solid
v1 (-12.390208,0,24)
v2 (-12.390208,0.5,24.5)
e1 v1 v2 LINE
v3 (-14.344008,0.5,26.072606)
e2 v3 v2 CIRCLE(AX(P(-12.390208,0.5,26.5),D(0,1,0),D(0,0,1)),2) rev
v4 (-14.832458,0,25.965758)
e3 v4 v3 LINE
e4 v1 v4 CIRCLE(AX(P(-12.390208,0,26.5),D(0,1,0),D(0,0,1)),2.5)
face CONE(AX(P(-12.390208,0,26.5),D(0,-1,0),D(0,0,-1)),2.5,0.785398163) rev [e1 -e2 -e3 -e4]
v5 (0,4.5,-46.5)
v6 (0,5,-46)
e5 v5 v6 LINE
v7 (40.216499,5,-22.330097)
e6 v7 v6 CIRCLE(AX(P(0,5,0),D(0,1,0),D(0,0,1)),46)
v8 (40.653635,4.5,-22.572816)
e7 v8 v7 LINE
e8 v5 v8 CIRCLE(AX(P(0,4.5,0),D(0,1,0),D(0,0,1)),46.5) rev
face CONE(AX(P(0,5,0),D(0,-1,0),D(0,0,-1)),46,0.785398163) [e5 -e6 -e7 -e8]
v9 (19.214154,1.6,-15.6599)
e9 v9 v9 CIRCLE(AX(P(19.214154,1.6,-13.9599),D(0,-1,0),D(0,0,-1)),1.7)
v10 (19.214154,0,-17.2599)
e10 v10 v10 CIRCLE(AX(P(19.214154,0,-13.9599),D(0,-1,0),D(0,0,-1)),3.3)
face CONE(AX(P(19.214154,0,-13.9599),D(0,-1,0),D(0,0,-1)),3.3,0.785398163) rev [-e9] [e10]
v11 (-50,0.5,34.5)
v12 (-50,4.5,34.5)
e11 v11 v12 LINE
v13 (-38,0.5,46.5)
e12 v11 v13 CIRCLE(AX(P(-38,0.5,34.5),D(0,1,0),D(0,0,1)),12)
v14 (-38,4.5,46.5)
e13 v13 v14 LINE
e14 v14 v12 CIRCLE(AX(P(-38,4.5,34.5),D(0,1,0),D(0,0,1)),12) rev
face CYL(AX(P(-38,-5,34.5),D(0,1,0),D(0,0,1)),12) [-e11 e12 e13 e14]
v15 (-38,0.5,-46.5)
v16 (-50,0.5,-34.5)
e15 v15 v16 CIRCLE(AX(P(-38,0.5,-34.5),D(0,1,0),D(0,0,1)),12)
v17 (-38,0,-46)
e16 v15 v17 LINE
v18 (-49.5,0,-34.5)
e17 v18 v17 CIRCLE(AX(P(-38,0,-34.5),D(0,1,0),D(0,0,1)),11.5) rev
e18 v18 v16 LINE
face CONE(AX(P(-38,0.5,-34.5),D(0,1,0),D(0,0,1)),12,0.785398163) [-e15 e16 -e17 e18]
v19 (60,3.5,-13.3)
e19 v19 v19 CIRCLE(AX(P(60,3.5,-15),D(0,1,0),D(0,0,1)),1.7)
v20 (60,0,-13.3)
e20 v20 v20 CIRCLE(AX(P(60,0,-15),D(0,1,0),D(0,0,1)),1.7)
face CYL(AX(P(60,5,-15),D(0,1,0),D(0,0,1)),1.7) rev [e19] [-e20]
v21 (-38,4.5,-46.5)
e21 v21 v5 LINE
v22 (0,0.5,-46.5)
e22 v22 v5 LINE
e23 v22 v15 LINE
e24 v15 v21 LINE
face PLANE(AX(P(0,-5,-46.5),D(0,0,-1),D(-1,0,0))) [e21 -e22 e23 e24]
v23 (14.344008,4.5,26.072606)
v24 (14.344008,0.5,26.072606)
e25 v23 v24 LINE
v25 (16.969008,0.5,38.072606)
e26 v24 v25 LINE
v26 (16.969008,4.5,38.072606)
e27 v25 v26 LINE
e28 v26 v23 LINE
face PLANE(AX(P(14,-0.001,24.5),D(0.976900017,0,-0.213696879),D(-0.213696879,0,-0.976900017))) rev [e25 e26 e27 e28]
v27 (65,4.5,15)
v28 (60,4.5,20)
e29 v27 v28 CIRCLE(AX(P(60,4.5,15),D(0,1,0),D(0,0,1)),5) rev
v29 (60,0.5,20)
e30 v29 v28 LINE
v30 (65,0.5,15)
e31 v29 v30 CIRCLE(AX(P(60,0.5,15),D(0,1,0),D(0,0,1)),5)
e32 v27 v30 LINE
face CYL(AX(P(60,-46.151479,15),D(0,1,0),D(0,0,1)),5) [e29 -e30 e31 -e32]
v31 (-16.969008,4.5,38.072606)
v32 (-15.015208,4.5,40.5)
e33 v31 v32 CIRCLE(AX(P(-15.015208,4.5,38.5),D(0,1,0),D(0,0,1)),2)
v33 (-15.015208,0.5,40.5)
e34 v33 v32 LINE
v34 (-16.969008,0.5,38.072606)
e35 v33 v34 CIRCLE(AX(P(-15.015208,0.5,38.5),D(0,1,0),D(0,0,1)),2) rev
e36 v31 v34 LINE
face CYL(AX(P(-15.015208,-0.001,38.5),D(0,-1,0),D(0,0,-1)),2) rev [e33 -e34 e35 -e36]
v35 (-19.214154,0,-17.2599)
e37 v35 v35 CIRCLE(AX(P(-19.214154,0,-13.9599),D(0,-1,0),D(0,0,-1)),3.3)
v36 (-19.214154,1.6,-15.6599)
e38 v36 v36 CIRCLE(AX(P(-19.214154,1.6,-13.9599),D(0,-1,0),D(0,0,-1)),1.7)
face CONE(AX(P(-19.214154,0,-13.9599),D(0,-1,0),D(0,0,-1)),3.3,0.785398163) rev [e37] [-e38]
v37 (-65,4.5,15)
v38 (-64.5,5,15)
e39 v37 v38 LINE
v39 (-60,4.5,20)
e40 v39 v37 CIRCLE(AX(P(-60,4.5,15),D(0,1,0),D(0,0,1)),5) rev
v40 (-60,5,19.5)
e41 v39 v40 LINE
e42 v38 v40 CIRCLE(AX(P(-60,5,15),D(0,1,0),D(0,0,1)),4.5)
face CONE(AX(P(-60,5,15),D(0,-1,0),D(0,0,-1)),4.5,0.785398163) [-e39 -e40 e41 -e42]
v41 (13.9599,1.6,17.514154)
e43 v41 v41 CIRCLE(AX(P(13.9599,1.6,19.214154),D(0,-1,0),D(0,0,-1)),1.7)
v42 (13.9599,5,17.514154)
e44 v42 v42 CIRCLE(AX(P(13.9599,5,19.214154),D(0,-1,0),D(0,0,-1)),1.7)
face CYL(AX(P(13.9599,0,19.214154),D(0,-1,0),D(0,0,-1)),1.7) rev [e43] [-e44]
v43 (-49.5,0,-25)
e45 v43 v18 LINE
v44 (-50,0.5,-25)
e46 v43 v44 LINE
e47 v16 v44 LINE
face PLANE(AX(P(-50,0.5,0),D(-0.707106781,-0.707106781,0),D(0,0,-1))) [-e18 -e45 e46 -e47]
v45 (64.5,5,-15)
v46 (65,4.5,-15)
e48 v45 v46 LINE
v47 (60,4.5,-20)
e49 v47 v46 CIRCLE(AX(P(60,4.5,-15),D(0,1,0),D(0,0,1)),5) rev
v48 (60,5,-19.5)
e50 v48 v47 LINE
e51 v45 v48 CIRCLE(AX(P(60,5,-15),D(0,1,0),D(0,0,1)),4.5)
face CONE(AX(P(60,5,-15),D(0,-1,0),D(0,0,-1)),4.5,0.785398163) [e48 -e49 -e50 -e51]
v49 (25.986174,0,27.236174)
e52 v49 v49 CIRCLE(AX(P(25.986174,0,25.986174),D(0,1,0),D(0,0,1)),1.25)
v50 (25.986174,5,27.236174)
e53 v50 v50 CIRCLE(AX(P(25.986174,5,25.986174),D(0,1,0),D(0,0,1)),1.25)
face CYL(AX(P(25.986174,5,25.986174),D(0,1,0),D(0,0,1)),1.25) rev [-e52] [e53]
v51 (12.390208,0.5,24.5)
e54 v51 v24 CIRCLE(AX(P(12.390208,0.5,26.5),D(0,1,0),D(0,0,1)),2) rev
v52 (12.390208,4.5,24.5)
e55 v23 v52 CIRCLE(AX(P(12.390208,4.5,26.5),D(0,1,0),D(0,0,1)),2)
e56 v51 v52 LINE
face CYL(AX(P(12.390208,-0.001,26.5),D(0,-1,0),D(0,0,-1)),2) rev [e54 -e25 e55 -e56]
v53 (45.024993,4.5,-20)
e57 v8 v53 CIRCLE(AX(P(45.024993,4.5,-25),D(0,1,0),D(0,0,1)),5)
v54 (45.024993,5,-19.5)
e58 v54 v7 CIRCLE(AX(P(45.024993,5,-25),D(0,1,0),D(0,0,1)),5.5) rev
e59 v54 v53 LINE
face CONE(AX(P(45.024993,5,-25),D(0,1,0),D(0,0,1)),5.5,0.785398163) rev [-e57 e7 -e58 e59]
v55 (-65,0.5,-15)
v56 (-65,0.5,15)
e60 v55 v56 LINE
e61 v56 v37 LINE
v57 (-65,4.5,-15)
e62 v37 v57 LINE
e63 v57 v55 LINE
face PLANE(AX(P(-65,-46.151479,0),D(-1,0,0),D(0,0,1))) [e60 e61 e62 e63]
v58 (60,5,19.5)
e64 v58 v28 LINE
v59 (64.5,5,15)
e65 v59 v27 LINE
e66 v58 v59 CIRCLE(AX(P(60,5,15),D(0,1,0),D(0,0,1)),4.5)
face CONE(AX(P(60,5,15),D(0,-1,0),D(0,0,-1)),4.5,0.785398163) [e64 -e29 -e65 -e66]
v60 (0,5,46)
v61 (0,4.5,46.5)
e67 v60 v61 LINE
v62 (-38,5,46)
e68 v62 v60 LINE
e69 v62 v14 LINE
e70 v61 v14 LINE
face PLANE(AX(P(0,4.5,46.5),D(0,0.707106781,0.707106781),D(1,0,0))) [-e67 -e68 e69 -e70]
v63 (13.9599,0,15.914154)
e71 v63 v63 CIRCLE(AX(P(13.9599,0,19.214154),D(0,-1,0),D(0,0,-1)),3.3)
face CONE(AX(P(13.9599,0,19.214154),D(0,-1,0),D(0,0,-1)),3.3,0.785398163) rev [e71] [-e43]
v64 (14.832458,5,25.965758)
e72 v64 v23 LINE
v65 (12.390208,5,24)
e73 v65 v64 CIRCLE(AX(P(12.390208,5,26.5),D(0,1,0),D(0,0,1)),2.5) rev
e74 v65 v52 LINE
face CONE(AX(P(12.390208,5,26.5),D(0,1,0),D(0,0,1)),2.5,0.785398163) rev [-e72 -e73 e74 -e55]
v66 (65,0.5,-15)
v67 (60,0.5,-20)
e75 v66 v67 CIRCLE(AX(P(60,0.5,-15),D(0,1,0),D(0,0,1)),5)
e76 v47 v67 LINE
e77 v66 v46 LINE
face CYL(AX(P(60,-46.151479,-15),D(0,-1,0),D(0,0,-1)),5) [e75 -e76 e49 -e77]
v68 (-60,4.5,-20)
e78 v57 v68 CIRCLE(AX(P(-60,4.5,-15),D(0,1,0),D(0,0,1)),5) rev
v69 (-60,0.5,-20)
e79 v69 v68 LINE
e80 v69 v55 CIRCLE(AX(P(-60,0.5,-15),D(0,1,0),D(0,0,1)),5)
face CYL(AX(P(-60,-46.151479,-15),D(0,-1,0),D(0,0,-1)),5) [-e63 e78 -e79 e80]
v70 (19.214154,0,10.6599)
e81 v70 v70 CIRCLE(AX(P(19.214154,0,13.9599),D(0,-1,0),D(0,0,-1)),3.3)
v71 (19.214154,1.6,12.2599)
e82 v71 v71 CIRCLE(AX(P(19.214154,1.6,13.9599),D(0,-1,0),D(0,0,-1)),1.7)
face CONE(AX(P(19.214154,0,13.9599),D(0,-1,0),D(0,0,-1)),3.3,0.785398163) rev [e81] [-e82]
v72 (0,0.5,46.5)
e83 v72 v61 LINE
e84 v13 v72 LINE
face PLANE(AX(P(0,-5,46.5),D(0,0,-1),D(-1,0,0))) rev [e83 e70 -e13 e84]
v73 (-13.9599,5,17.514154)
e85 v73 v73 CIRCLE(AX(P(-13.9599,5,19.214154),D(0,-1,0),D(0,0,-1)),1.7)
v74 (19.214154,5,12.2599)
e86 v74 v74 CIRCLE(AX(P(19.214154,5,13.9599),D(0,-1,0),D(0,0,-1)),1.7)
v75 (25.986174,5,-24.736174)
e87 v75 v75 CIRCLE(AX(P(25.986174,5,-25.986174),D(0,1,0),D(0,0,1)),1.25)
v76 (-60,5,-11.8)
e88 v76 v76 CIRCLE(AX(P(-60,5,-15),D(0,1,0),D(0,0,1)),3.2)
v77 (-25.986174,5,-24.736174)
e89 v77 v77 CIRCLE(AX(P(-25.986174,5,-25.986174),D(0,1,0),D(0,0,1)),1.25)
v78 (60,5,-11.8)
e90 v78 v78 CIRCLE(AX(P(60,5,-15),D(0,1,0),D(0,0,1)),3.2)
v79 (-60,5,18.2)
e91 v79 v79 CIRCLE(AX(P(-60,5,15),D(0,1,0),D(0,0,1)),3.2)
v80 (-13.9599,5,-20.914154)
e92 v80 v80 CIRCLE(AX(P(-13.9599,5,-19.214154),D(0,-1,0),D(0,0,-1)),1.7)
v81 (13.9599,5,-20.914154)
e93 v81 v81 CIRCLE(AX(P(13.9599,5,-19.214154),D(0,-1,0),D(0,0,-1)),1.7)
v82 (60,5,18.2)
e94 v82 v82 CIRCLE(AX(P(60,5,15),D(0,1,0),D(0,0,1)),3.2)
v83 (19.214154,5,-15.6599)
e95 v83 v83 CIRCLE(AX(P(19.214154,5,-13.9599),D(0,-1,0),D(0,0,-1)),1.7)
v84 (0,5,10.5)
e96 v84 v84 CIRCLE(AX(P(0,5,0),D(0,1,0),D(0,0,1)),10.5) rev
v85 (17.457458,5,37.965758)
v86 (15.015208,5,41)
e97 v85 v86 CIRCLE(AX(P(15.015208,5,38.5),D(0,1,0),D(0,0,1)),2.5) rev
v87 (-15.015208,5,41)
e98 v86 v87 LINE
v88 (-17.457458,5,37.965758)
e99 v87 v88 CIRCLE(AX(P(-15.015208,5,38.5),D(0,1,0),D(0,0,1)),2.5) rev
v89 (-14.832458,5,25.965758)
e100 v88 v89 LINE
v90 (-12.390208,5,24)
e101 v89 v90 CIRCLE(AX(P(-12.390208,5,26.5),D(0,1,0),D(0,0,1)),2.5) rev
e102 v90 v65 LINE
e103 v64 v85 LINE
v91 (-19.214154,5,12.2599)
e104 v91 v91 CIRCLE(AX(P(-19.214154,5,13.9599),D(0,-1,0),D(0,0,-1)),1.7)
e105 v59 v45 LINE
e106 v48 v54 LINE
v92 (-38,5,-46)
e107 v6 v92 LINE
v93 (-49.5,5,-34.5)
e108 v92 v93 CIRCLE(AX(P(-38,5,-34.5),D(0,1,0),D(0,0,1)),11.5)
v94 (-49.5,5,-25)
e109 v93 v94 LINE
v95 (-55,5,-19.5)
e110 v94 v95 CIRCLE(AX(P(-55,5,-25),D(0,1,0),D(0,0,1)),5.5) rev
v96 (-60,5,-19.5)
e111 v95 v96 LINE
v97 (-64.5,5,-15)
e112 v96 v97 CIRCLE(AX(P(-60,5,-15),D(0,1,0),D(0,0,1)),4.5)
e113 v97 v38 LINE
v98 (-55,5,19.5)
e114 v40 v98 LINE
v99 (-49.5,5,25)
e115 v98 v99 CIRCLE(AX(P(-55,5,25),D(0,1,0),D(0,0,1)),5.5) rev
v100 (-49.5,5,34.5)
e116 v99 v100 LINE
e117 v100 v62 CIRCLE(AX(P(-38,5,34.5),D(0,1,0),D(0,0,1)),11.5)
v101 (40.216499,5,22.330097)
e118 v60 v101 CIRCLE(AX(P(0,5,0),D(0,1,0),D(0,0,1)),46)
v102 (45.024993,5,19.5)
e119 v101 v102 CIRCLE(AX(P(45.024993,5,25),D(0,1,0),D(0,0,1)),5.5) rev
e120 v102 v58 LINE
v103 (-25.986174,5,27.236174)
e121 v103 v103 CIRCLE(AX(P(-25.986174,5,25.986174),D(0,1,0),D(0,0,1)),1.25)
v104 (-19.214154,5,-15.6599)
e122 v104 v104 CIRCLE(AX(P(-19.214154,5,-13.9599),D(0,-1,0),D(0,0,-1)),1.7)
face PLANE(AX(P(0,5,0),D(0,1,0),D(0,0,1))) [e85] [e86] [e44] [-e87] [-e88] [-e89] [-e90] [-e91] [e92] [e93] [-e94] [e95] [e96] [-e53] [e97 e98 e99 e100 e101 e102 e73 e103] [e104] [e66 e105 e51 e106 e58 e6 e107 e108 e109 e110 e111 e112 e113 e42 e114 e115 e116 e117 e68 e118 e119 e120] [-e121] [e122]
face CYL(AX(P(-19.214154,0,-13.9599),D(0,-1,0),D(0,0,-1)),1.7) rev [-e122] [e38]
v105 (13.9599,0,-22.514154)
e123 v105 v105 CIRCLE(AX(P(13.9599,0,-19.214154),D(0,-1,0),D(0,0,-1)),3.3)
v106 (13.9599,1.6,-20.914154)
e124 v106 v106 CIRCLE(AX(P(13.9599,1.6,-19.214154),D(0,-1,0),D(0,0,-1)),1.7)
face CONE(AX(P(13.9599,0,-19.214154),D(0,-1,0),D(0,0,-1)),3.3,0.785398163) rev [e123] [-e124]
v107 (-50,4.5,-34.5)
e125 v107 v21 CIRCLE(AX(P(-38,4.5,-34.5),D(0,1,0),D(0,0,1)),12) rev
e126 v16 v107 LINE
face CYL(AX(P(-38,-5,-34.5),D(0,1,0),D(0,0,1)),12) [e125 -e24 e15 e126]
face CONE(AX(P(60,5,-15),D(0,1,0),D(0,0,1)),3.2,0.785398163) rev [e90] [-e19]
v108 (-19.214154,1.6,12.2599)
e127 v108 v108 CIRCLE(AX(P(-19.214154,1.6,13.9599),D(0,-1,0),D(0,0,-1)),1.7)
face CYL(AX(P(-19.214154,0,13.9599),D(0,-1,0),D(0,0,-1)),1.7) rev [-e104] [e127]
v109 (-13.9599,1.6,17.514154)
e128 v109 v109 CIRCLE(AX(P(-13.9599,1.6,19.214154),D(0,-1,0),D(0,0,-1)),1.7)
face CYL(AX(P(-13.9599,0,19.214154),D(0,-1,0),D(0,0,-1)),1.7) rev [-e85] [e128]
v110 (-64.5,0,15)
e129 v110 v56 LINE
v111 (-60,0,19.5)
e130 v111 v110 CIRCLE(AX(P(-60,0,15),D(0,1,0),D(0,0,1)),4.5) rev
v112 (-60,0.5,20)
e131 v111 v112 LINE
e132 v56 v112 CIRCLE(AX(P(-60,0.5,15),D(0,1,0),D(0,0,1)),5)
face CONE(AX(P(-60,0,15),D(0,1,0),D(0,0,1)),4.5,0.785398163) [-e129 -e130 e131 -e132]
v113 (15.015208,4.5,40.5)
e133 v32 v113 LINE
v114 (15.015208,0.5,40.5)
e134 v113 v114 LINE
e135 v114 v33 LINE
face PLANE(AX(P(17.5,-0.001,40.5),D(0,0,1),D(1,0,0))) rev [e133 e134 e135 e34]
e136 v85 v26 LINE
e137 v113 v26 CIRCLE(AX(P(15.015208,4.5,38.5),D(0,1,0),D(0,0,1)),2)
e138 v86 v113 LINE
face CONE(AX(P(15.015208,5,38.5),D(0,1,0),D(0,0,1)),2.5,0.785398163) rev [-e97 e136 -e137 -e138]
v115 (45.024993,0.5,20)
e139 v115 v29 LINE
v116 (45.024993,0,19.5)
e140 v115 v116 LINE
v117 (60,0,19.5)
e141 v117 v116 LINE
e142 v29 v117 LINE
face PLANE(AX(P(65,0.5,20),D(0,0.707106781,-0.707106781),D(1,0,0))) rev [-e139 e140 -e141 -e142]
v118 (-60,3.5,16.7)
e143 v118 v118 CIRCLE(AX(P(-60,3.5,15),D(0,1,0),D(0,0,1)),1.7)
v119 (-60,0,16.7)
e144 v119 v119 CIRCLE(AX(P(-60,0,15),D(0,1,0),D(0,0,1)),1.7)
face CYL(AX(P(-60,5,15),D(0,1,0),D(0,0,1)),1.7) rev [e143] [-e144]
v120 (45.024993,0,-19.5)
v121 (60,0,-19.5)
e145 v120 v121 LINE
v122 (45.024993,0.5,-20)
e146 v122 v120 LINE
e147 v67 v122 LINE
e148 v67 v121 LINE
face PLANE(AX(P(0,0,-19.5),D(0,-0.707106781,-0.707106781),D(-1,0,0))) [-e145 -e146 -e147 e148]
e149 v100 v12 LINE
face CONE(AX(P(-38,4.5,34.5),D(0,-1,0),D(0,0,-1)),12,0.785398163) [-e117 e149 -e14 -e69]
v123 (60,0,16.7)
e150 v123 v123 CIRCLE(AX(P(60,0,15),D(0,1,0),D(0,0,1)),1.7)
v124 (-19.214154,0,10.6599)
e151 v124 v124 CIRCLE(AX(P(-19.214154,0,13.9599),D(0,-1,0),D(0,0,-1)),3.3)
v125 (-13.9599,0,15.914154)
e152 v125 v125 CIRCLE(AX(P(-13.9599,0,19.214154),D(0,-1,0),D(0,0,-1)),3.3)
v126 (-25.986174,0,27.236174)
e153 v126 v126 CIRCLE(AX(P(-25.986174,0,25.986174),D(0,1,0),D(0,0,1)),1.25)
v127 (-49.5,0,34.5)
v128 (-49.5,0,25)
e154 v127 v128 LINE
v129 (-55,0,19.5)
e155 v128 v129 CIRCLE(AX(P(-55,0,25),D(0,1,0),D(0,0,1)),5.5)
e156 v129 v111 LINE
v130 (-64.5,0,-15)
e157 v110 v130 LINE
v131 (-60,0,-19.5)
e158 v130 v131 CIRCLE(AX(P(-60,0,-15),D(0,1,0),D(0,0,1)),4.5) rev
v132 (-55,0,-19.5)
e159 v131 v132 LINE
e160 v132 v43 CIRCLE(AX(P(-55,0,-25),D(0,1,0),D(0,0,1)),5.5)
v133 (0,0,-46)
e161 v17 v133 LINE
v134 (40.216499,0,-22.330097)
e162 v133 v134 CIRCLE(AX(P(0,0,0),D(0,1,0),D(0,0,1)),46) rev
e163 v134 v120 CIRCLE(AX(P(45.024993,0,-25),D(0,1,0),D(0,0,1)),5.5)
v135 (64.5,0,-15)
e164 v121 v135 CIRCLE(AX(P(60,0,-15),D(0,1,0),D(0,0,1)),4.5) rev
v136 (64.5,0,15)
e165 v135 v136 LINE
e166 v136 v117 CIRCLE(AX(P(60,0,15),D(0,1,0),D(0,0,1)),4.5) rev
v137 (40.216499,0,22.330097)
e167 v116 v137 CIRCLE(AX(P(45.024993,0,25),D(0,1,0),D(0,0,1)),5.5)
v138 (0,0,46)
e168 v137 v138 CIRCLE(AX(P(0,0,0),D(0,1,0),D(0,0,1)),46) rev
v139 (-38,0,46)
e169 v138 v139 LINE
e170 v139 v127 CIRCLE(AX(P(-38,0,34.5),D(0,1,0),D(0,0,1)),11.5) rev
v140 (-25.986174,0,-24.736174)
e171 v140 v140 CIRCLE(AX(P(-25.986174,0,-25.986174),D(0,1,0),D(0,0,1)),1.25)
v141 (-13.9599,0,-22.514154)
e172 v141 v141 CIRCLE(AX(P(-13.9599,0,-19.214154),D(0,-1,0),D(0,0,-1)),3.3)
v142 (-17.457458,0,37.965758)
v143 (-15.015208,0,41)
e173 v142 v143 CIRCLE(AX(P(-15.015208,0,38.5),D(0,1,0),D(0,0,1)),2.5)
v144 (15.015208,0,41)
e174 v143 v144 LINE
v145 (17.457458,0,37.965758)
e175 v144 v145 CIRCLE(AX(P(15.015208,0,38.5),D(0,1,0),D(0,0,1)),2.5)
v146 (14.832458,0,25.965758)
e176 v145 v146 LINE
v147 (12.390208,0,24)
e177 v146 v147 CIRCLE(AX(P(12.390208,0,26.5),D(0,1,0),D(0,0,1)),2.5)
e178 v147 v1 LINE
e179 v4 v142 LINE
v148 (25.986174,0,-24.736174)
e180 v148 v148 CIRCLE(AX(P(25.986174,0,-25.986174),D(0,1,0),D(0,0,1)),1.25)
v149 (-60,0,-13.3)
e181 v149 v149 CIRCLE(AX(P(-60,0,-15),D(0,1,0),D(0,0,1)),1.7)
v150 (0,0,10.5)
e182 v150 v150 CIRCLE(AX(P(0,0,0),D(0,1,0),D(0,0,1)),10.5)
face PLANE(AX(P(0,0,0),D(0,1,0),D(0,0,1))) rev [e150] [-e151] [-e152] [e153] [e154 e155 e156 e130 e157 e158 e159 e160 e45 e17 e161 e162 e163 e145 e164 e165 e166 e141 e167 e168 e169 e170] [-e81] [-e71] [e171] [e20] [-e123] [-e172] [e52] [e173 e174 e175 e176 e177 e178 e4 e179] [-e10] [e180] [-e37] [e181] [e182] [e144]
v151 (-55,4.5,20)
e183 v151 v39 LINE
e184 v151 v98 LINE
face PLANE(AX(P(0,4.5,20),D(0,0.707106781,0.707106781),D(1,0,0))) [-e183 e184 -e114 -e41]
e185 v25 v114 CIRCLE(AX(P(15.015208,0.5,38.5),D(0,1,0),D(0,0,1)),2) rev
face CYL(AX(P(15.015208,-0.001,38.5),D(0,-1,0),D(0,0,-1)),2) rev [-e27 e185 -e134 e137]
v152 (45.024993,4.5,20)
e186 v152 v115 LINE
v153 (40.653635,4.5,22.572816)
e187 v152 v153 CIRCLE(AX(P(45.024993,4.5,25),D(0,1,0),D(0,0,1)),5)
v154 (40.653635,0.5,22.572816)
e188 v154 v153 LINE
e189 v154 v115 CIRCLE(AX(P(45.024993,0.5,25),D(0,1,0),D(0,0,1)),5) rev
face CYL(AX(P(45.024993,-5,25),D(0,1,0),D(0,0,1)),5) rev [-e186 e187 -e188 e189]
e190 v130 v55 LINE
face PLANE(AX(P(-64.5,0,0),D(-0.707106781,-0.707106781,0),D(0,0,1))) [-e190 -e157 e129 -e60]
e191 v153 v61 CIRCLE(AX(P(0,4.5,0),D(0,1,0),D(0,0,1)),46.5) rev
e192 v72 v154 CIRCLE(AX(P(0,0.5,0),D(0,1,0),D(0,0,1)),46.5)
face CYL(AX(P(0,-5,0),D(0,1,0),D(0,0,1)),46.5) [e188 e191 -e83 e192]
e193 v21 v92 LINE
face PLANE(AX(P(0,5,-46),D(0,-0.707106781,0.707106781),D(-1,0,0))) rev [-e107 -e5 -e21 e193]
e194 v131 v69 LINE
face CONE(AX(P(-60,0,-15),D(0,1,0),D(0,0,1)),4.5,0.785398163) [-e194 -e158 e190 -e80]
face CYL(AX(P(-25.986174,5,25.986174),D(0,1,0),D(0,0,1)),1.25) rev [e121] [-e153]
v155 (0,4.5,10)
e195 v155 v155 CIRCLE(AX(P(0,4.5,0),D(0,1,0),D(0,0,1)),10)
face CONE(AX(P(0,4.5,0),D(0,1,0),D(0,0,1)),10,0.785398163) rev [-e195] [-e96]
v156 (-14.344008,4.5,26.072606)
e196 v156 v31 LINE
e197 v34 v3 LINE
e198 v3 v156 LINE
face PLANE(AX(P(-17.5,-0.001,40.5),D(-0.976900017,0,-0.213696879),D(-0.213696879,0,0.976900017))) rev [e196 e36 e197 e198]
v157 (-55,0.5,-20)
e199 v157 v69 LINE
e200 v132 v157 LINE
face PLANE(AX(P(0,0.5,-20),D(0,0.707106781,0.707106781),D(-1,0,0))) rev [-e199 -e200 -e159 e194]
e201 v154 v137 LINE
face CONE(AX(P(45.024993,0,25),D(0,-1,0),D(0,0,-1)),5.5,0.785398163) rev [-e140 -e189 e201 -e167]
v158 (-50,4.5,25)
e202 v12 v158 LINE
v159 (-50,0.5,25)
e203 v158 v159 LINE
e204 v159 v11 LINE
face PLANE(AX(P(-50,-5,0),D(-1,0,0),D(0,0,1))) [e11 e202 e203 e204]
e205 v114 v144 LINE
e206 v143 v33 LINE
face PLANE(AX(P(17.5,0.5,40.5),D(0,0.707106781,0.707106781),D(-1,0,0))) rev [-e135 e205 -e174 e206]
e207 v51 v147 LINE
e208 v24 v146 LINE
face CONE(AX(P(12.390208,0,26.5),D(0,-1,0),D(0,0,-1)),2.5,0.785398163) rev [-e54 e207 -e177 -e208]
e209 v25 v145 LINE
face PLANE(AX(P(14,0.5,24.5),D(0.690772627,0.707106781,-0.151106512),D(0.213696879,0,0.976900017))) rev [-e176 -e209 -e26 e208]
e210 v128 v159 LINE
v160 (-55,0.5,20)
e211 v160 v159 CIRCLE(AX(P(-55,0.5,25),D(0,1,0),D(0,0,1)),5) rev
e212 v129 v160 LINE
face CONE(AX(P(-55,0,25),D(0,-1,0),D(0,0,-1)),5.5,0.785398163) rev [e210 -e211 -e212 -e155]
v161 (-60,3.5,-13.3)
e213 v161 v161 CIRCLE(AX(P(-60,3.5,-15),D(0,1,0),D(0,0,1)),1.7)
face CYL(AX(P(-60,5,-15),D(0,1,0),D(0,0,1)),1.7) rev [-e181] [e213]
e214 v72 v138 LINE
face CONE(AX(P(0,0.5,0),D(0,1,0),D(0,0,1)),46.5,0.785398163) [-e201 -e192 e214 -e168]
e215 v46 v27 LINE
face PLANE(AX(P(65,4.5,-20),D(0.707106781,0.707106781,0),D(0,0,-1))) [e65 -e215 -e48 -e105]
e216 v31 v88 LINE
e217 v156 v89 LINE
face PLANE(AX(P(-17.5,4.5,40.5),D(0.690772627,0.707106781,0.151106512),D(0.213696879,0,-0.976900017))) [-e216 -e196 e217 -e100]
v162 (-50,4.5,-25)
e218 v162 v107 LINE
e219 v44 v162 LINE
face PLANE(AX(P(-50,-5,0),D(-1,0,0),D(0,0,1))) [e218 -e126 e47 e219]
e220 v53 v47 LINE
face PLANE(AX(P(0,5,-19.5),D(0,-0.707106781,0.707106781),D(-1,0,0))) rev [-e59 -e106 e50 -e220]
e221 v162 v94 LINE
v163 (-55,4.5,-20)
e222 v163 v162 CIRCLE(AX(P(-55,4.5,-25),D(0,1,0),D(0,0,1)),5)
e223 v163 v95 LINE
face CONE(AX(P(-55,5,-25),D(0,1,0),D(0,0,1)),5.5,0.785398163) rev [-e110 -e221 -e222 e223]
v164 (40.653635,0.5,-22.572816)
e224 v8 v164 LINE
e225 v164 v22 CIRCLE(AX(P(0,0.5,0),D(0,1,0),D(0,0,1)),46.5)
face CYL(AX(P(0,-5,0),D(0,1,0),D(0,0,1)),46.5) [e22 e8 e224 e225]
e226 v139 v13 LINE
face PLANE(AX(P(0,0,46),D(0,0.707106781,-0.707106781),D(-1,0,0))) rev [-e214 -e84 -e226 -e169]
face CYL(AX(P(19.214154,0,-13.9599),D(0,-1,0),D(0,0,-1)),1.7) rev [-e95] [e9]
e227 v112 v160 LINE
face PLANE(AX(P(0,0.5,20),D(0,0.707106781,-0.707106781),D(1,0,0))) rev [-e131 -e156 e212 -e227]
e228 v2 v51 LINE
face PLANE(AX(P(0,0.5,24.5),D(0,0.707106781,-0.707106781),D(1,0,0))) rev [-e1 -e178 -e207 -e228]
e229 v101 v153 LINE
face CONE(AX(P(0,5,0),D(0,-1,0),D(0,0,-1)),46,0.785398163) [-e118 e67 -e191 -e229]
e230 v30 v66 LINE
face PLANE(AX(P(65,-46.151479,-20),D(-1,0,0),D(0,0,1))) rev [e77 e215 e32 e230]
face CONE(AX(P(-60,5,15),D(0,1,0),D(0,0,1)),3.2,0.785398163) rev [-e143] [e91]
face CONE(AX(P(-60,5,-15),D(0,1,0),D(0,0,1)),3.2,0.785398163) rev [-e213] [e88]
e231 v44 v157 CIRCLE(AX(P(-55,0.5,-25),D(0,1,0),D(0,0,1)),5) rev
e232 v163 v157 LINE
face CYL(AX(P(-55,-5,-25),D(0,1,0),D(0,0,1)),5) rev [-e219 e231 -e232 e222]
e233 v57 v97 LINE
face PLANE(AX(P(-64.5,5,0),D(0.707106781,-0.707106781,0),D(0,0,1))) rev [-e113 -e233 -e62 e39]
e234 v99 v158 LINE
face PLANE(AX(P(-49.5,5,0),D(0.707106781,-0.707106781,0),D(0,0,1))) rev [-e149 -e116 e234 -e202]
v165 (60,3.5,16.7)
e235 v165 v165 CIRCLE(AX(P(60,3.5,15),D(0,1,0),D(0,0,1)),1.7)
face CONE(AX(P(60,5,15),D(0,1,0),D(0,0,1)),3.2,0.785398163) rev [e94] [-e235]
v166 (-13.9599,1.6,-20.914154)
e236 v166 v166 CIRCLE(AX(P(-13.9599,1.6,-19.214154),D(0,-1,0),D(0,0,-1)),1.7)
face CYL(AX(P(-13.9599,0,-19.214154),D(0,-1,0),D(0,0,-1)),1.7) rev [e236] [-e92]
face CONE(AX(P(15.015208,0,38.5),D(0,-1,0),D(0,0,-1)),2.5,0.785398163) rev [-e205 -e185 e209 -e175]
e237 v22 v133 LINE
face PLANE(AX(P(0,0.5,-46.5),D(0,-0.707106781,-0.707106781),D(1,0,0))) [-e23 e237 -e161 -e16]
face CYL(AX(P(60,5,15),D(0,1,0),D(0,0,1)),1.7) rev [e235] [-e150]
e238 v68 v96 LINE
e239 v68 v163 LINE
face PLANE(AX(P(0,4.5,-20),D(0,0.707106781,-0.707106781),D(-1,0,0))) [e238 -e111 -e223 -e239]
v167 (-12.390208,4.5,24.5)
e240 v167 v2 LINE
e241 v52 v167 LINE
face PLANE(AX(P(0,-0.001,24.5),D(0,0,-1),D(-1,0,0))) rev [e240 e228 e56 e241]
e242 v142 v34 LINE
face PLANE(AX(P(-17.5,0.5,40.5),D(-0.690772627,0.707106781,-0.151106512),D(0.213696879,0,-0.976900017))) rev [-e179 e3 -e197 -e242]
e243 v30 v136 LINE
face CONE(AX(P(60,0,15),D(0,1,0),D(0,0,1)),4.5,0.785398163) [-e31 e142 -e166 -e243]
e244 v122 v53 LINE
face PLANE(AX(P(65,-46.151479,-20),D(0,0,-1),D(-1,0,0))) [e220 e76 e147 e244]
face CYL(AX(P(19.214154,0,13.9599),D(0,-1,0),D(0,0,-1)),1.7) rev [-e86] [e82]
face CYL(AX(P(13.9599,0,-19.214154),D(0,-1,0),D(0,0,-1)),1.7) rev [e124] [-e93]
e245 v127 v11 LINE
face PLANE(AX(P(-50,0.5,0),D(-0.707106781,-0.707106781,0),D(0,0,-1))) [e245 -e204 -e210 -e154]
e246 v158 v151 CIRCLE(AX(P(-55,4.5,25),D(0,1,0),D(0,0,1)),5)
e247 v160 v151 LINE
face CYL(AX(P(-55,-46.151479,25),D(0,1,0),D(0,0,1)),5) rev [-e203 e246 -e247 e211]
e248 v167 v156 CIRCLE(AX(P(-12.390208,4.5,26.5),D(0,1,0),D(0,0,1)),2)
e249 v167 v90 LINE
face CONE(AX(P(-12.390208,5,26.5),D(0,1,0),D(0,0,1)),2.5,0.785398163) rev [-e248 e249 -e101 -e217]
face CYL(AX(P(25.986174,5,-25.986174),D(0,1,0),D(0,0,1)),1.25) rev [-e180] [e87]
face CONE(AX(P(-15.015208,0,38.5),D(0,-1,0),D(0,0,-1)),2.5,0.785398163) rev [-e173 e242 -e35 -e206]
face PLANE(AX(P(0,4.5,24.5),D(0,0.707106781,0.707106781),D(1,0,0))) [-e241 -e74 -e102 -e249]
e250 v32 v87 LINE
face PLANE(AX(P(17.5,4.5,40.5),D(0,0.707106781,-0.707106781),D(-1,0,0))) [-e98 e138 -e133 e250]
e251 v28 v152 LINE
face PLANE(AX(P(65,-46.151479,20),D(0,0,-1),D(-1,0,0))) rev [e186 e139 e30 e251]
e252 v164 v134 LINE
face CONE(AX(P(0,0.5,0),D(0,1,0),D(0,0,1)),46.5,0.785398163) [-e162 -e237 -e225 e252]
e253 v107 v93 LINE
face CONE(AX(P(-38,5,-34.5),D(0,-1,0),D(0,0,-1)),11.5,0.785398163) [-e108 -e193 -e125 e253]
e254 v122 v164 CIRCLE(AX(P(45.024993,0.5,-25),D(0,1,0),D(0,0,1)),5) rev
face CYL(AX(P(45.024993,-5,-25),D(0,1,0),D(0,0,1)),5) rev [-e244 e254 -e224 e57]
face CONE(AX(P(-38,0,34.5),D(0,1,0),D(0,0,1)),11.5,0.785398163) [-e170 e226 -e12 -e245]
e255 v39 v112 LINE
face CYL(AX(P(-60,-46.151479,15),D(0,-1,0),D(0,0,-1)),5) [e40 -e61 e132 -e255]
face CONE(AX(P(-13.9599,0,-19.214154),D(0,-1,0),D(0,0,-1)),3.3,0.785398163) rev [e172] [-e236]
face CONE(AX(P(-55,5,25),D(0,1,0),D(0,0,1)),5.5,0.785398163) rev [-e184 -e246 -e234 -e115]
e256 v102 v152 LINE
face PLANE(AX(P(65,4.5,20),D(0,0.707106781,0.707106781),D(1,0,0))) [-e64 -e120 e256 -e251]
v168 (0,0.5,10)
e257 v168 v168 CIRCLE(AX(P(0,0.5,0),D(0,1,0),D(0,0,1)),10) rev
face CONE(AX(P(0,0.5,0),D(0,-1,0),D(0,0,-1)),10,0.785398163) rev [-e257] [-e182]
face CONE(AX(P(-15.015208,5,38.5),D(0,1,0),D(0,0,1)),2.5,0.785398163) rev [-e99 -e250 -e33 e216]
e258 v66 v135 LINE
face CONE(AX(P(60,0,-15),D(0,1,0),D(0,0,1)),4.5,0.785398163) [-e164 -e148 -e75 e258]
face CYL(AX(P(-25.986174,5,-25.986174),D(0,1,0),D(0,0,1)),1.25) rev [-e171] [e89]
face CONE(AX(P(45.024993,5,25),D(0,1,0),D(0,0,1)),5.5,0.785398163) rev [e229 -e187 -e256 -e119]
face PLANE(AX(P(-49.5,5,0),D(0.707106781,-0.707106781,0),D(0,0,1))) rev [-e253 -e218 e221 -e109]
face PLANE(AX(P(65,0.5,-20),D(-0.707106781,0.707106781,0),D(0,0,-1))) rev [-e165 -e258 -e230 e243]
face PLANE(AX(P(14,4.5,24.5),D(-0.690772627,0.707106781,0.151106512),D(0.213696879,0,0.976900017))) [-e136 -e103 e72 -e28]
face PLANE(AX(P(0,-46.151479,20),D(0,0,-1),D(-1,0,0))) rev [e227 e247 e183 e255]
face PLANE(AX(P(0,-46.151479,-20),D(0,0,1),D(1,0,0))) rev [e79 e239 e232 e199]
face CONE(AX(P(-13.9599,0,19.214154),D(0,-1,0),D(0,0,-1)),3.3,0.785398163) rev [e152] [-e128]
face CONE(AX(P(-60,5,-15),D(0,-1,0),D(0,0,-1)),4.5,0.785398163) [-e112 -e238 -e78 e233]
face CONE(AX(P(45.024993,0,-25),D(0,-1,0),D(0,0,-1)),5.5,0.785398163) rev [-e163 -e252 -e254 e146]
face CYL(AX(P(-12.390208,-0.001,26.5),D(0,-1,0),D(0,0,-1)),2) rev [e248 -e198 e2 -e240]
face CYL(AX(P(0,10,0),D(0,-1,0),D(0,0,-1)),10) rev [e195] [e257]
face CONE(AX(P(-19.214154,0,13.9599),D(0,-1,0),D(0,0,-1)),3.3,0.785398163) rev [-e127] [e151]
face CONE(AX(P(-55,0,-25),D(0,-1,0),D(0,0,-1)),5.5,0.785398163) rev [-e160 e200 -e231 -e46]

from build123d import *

# Parameters (mm, degrees)
SKETCH_1_W                     = 120
SKETCH_1_H                     = 120
EXTRUDE_1_DEPTH                = 5
FILLET_1_R                     = 10
SKETCH_11_R                    = 1
CUT_EXTRUDE_2_DEPTH            = 10
HOLE_WIZARD_M3_1_D             = 3.4
HOLE_WIZARD_M3_1_DEPTH         = 5
HOLE_WIZARD_M3_1_CSINK_D       = 6.6
HOLE_WIZARD_M3_1_CSINK_ANGLE   = 90
HOLE_WIZARD_M3_1_2_OUTLINE_R   = 1.25
HOLE_WIZARD_M3_1_2_DEPTH       = 5
CUT_EXTRUDE_3_REACH            = 87
FILLET_2_R                     = 2
SKETCH_17_OUTSIDE_W            = 155.956
SKETCH_17_OUTSIDE_H            = 155.956
CUT_EXTRUDE_4_DEPTH            = 10
SKETCH_18_R                    = 1.6
SKETCH_18_W                    = 15
SKETCH_18_H                    = 40
EXTRUDE_2_DEPTH                = 5
FILLET_3_R                     = 5
SKETCH_23_R                    = 10
CUT_EXTRUDE_5_DEPTH            = 10
HOLE_WIZARD_M3_1_3_D           = 3.4
HOLE_WIZARD_M3_1_3_DEPTH       = 6
HOLE_WIZARD_M3_1_3_CSINK_D     = 6.4
HOLE_WIZARD_M3_1_3_CSINK_ANGLE = 90
HOLE_WIZARD_M3_1_3_TIP         = 1.021463052
CHAMFER_2_SIZE                 = 0.5


# Read off the part's stored shape, not the designer's step: M3 螺纹孔1
with BuildPart() as part:
    # 草图1 → 凸台-拉伸1 (new body)
    with BuildSketch(Plane(origin=(0, 0, 0), x_dir=(1, 0, 0), z_dir=(0, 1, 0))):
        Rectangle(SKETCH_1_W, SKETCH_1_H)
    extrude(amount=EXTRUDE_1_DEPTH)

    # 圆角1
    fillet_1_edges = [part.edges().sort_by_distance(p)[0] for p in [
        (60, 2.5, 60),
        (-60, 2.5, 60),
        (-60, 2.5, -60),
        (60, 2.5, -60),
    ]]
    fillet(fillet_1_edges, radius=FILLET_1_R)

    # 草图11 → 切除-拉伸2 (cut)
    with BuildSketch(Plane(origin=(0, 5, 0), x_dir=(1, 0, 0), z_dir=(0, 1, 0))):
        with Locations(Location((-13.959899742, 19.214153616, 0), (0, 0, 270))):
            Circle(SKETCH_11_R)
        with Locations(Location((-19.214153616, 13.959899742, 0), (0, 0, 270))):
            Circle(SKETCH_11_R)
        with Locations(Location((19.214153616, 13.959899742, 0), (0, 0, 270))):
            Circle(SKETCH_11_R)
        with Locations(Location((13.959899742, 19.214153616, 0), (0, 0, 270))):
            Circle(SKETCH_11_R)
        with Locations(Location((-19.214153616, -13.959899742, 0), (0, 0, 270))):
            Circle(SKETCH_11_R)
        with Locations(Location((-13.959899742, -19.214153616, 0), (0, 0, 270))):
            Circle(SKETCH_11_R)
        with Locations(Location((19.214153616, -13.959899742, 0), (0, 0, 270))):
            Circle(SKETCH_11_R)
        with Locations(Location((13.959899742, -19.214153616, 0), (0, 0, 270))):
            Circle(SKETCH_11_R)
    extrude(amount=-CUT_EXTRUDE_2_DEPTH, mode=Mode.SUBTRACT)

    # Hole Wizard M3 _1
    with Locations(Plane(origin=(0, 0, 0), x_dir=(-1, 0, 0), z_dir=(0, -1, 0))):
        with Locations((-13.959899742, 19.214153616), (-19.214153616, 13.959899742), (-19.214153616, -13.959899742), (-13.959899742, -19.214153616), (13.959899742, -19.214153616), (19.214153616, -13.959899742), (13.959899742, 19.214153616), (19.214153616, 13.959899742)):
            CounterSinkHole(HOLE_WIZARD_M3_1_D / 2, HOLE_WIZARD_M3_1_CSINK_D / 2, depth=HOLE_WIZARD_M3_1_DEPTH, counter_sink_angle=HOLE_WIZARD_M3_1_CSINK_ANGLE)

    # Hole Wizard M3 _1 2 outline → Hole Wizard M3 _1 2 (cut)
    with BuildSketch(Plane(origin=(0, 0, 0), x_dir=(1, 0, 0), z_dir=(0, 1, 0))):
        with Locations((-25.986174209, -25.986174209)):
            Circle(HOLE_WIZARD_M3_1_2_OUTLINE_R)
        with Locations((25.986174209, -25.986174209)):
            Circle(HOLE_WIZARD_M3_1_2_OUTLINE_R)
        with Locations((25.986174209, 25.986174209)):
            Circle(HOLE_WIZARD_M3_1_2_OUTLINE_R)
        with Locations((-25.986174209, 25.986174209)):
            Circle(HOLE_WIZARD_M3_1_2_OUTLINE_R)
    extrude(amount=HOLE_WIZARD_M3_1_2_DEPTH, mode=Mode.SUBTRACT)

    # 草图16 → 切除-拉伸3 (cut, up to next)
    with BuildSketch(Plane(origin=(0, 5, 0), x_dir=(1, 0, 0), z_dir=(0, 1, 0)), mode=Mode.PRIVATE) as cut_extrude_3_sk1:
        Polygon((0, -24.5), (14, -24.5), (17.5, -40.5), (0, -40.5), (-17.5, -40.5), (-14, -24.5), align=None)
    cut_extrude_3_tool1 = extrude(cut_extrude_3_sk1.sketch, amount=-CUT_EXTRUDE_3_REACH, mode=Mode.PRIVATE) & part.part
    add(cut_extrude_3_tool1.solids().sort_by_distance((0, 5, 32.796296))[0], mode=Mode.SUBTRACT)

    # 圆角2
    fillet_2_edges = [part.edges().sort_by_distance(p)[0] for p in [
        (-14, 2.5, 24.5),
        (14, 2.5, 24.5),
        (17.5, 2.5, 40.5),
        (-17.5, 2.5, 40.5),
    ]]
    fillet(fillet_2_edges, radius=FILLET_2_R)

    # 草图17 outside → 切除-拉伸4 (cut)
    with BuildSketch(Plane(origin=(0, 5, 0), x_dir=(1, 0, 0), z_dir=(0, 1, 0))):
        Rectangle(SKETCH_17_OUTSIDE_W, SKETCH_17_OUTSIDE_H)
        with BuildLine():
            Line((1e-09, -46.5), (-38, -46.5))
            ThreePointArc((-38, -46.5), (-46.485281374, -42.985281374), (-50, -34.5))
            Line((-50, -34.5), (-50, 34.5))
            ThreePointArc((-50, 34.5), (-46.485281374, 42.985281374), (-38, 46.5))
            Line((-38, 46.5), (1e-09, 46.5))
            ThreePointArc((1e-09, 46.5), (46.5, 0), (1e-09, -46.5))
        make_face(mode=Mode.SUBTRACT)
    extrude(amount=-CUT_EXTRUDE_4_DEPTH, mode=Mode.SUBTRACT)

    # 草图18 → 凸台-拉伸2 (add)
    # profile 1 of 2: a face of its own
    with BuildSketch(Plane(origin=(0, 5, 0), x_dir=(1, 0, 0), z_dir=(0, 1, 0))):
        with BuildLine():
            Line((65, 20), (65, -20))
            Line((65, -20), (41.979161497, -20))
            ThreePointArc((41.979161497, -20), (46.5, 0), (41.979161497, 20))
            Line((41.979161497, 20), (65, 20))
        make_face()
        with Locations(Location((60, 15, 0), (0, 0, 270))):
            Circle(SKETCH_18_R, mode=Mode.SUBTRACT)
        with Locations(Location((60, -15, 0), (0, 0, 270))):
            Circle(SKETCH_18_R, mode=Mode.SUBTRACT)
    # profile 2 of 2: a face of its own
    with BuildSketch(Plane(origin=(0, 5, 0), x_dir=(1, 0, 0), z_dir=(0, 1, 0))):
        with Locations((-57.5, 0)):
            Rectangle(SKETCH_18_W, SKETCH_18_H)
        with Locations(Location((-60, 15, 0), (0, 0, 270))):
            Circle(SKETCH_18_R, mode=Mode.SUBTRACT)
        with Locations(Location((-60, -15, 0), (0, 0, 270))):
            Circle(SKETCH_18_R, mode=Mode.SUBTRACT)
    extrude(amount=-EXTRUDE_2_DEPTH)

    # 圆角3
    fillet_3_edges = [part.edges().sort_by_distance(p)[0] for p in [
        (-50, 2.5, 20),
        (-65, 2.5, 20),
        (-65, 2.5, -20),
        (-50, 2.5, -20),
        (65, 2.5, 20),
        (41.979161497, 2.5, 20),
        (41.979161497, 2.5, -20),
        (65, 2.5, -20),
    ]]
    fillet(fillet_3_edges, radius=FILLET_3_R)

    # 草图23 → 切除-拉伸5 (cut)
    with BuildSketch(Plane.XZ):
        with Locations(Location((0, 0, 0), (0, 0, 270))):
            Circle(SKETCH_23_R)
    extrude(amount=-CUT_EXTRUDE_5_DEPTH, mode=Mode.SUBTRACT)

    # Hole Wizard M3 _1 3
    with Locations(Plane(origin=(0, 5, 0), x_dir=(1, 0, 0), z_dir=(0, 1, 0))):
        with Locations((-60, 15), (-60, -15), (60, 15), (60, -15)):
            CounterSinkHole(HOLE_WIZARD_M3_1_3_D / 2, HOLE_WIZARD_M3_1_3_CSINK_D / 2, depth=HOLE_WIZARD_M3_1_3_DEPTH, counter_sink_angle=HOLE_WIZARD_M3_1_3_CSINK_ANGLE)
            with Locations((0, 0, -(HOLE_WIZARD_M3_1_3_DEPTH + HOLE_WIZARD_M3_1_3_TIP / 2))):  # 118° drill point
                Cone(0, HOLE_WIZARD_M3_1_3_D / 2, HOLE_WIZARD_M3_1_3_TIP, mode=Mode.SUBTRACT)

    # 倒角2
    chamfer_2_edges = [part.edges().sort_by_distance(p)[0] for p in [
        (0, 0, 40.5),
        (0, 5, 40.5),
        (-15.656507616, 0, 32.072606242),
        (-15.656507616, 5, 32.072606242),
        (15.656507616, 0, 32.072606242),
        (15.656507616, 5, 32.072606242),
        (0, 0, 24.5),
        (0, 5, 24.5),
        (-16.573217131, 5, 39.754035981),
        (-16.573217131, 0, 39.754035981),
        (16.573217131, 5, 39.754035981),
        (16.573217131, 0, 39.754035981),
        (13.644243562, 5, 24.94199045),
        (13.644243562, 0, 24.94199045),
        (-13.644243562, 5, 24.94199045),
        (-13.644243562, 0, 24.94199045),
        (23.58616202, 0, 40.07421816),
        (-19, 5, 46.5),
        (-46.485281374, 5, 42.985281374),
        (-50, 0, -29.75),
        (-46.485281374, 0, -42.985281374),
        (-19, 0, -46.5),
        (-19, 0, 46.5),
        (-46.485281374, 0, 42.985281374),
        (23.58616202, 5, 40.07421816),
        (-19, 5, -46.5),
        (-46.485281374, 5, -42.985281374),
        (-50, 5, -29.75),
        (-57.5, 0, -20),
        (-57.5, 5, -20),
        (52.51249653, 5, 20),
        (65, 5, 0),
        (52.51249653, 5, -20),
        (23.58616202, 5, -40.07421816),
        (-65, 5, 0),
        (-57.5, 5, 20),
        (-50, 5, 29.75),
        (63.535533906, 5, -18.535533906),
        (63.535533906, 5, 18.535533906),
        (-63.535533906, 5, 18.535533906),
        (-63.535533906, 5, -18.535533906),
        (-65, 0, 0),
        (-50, 0, 29.75),
        (-57.5, 0, 20),
        (23.58616202, 0, -40.07421816),
        (52.51249653, 0, -20),
        (65, 0, 0),
        (52.51249653, 0, 20),
        (63.535533906, 0, -18.535533906),
        (63.535533906, 0, 18.535533906),
        (-63.535533906, 0, 18.535533906),
        (-63.535533906, 0, -18.535533906),
        (-51.464466094, 5, -21.464466094),
        (-51.464466094, 0, -21.464466094),
        (-51.464466094, 5, 21.464466094),
        (-51.464466094, 0, 21.464466094),
        (42.488846606, 5, 20.690944284),
        (42.488846606, 0, 20.690944284),
        (42.488846606, 5, -20.690944284),
        (42.488846606, 0, -20.690944284),
        (0, 5, 10),
        (0, 0, 10),
    ]]
    chamfer(chamfer_2_edges, length=CHAMFER_2_SIZE)


solid = part.part
